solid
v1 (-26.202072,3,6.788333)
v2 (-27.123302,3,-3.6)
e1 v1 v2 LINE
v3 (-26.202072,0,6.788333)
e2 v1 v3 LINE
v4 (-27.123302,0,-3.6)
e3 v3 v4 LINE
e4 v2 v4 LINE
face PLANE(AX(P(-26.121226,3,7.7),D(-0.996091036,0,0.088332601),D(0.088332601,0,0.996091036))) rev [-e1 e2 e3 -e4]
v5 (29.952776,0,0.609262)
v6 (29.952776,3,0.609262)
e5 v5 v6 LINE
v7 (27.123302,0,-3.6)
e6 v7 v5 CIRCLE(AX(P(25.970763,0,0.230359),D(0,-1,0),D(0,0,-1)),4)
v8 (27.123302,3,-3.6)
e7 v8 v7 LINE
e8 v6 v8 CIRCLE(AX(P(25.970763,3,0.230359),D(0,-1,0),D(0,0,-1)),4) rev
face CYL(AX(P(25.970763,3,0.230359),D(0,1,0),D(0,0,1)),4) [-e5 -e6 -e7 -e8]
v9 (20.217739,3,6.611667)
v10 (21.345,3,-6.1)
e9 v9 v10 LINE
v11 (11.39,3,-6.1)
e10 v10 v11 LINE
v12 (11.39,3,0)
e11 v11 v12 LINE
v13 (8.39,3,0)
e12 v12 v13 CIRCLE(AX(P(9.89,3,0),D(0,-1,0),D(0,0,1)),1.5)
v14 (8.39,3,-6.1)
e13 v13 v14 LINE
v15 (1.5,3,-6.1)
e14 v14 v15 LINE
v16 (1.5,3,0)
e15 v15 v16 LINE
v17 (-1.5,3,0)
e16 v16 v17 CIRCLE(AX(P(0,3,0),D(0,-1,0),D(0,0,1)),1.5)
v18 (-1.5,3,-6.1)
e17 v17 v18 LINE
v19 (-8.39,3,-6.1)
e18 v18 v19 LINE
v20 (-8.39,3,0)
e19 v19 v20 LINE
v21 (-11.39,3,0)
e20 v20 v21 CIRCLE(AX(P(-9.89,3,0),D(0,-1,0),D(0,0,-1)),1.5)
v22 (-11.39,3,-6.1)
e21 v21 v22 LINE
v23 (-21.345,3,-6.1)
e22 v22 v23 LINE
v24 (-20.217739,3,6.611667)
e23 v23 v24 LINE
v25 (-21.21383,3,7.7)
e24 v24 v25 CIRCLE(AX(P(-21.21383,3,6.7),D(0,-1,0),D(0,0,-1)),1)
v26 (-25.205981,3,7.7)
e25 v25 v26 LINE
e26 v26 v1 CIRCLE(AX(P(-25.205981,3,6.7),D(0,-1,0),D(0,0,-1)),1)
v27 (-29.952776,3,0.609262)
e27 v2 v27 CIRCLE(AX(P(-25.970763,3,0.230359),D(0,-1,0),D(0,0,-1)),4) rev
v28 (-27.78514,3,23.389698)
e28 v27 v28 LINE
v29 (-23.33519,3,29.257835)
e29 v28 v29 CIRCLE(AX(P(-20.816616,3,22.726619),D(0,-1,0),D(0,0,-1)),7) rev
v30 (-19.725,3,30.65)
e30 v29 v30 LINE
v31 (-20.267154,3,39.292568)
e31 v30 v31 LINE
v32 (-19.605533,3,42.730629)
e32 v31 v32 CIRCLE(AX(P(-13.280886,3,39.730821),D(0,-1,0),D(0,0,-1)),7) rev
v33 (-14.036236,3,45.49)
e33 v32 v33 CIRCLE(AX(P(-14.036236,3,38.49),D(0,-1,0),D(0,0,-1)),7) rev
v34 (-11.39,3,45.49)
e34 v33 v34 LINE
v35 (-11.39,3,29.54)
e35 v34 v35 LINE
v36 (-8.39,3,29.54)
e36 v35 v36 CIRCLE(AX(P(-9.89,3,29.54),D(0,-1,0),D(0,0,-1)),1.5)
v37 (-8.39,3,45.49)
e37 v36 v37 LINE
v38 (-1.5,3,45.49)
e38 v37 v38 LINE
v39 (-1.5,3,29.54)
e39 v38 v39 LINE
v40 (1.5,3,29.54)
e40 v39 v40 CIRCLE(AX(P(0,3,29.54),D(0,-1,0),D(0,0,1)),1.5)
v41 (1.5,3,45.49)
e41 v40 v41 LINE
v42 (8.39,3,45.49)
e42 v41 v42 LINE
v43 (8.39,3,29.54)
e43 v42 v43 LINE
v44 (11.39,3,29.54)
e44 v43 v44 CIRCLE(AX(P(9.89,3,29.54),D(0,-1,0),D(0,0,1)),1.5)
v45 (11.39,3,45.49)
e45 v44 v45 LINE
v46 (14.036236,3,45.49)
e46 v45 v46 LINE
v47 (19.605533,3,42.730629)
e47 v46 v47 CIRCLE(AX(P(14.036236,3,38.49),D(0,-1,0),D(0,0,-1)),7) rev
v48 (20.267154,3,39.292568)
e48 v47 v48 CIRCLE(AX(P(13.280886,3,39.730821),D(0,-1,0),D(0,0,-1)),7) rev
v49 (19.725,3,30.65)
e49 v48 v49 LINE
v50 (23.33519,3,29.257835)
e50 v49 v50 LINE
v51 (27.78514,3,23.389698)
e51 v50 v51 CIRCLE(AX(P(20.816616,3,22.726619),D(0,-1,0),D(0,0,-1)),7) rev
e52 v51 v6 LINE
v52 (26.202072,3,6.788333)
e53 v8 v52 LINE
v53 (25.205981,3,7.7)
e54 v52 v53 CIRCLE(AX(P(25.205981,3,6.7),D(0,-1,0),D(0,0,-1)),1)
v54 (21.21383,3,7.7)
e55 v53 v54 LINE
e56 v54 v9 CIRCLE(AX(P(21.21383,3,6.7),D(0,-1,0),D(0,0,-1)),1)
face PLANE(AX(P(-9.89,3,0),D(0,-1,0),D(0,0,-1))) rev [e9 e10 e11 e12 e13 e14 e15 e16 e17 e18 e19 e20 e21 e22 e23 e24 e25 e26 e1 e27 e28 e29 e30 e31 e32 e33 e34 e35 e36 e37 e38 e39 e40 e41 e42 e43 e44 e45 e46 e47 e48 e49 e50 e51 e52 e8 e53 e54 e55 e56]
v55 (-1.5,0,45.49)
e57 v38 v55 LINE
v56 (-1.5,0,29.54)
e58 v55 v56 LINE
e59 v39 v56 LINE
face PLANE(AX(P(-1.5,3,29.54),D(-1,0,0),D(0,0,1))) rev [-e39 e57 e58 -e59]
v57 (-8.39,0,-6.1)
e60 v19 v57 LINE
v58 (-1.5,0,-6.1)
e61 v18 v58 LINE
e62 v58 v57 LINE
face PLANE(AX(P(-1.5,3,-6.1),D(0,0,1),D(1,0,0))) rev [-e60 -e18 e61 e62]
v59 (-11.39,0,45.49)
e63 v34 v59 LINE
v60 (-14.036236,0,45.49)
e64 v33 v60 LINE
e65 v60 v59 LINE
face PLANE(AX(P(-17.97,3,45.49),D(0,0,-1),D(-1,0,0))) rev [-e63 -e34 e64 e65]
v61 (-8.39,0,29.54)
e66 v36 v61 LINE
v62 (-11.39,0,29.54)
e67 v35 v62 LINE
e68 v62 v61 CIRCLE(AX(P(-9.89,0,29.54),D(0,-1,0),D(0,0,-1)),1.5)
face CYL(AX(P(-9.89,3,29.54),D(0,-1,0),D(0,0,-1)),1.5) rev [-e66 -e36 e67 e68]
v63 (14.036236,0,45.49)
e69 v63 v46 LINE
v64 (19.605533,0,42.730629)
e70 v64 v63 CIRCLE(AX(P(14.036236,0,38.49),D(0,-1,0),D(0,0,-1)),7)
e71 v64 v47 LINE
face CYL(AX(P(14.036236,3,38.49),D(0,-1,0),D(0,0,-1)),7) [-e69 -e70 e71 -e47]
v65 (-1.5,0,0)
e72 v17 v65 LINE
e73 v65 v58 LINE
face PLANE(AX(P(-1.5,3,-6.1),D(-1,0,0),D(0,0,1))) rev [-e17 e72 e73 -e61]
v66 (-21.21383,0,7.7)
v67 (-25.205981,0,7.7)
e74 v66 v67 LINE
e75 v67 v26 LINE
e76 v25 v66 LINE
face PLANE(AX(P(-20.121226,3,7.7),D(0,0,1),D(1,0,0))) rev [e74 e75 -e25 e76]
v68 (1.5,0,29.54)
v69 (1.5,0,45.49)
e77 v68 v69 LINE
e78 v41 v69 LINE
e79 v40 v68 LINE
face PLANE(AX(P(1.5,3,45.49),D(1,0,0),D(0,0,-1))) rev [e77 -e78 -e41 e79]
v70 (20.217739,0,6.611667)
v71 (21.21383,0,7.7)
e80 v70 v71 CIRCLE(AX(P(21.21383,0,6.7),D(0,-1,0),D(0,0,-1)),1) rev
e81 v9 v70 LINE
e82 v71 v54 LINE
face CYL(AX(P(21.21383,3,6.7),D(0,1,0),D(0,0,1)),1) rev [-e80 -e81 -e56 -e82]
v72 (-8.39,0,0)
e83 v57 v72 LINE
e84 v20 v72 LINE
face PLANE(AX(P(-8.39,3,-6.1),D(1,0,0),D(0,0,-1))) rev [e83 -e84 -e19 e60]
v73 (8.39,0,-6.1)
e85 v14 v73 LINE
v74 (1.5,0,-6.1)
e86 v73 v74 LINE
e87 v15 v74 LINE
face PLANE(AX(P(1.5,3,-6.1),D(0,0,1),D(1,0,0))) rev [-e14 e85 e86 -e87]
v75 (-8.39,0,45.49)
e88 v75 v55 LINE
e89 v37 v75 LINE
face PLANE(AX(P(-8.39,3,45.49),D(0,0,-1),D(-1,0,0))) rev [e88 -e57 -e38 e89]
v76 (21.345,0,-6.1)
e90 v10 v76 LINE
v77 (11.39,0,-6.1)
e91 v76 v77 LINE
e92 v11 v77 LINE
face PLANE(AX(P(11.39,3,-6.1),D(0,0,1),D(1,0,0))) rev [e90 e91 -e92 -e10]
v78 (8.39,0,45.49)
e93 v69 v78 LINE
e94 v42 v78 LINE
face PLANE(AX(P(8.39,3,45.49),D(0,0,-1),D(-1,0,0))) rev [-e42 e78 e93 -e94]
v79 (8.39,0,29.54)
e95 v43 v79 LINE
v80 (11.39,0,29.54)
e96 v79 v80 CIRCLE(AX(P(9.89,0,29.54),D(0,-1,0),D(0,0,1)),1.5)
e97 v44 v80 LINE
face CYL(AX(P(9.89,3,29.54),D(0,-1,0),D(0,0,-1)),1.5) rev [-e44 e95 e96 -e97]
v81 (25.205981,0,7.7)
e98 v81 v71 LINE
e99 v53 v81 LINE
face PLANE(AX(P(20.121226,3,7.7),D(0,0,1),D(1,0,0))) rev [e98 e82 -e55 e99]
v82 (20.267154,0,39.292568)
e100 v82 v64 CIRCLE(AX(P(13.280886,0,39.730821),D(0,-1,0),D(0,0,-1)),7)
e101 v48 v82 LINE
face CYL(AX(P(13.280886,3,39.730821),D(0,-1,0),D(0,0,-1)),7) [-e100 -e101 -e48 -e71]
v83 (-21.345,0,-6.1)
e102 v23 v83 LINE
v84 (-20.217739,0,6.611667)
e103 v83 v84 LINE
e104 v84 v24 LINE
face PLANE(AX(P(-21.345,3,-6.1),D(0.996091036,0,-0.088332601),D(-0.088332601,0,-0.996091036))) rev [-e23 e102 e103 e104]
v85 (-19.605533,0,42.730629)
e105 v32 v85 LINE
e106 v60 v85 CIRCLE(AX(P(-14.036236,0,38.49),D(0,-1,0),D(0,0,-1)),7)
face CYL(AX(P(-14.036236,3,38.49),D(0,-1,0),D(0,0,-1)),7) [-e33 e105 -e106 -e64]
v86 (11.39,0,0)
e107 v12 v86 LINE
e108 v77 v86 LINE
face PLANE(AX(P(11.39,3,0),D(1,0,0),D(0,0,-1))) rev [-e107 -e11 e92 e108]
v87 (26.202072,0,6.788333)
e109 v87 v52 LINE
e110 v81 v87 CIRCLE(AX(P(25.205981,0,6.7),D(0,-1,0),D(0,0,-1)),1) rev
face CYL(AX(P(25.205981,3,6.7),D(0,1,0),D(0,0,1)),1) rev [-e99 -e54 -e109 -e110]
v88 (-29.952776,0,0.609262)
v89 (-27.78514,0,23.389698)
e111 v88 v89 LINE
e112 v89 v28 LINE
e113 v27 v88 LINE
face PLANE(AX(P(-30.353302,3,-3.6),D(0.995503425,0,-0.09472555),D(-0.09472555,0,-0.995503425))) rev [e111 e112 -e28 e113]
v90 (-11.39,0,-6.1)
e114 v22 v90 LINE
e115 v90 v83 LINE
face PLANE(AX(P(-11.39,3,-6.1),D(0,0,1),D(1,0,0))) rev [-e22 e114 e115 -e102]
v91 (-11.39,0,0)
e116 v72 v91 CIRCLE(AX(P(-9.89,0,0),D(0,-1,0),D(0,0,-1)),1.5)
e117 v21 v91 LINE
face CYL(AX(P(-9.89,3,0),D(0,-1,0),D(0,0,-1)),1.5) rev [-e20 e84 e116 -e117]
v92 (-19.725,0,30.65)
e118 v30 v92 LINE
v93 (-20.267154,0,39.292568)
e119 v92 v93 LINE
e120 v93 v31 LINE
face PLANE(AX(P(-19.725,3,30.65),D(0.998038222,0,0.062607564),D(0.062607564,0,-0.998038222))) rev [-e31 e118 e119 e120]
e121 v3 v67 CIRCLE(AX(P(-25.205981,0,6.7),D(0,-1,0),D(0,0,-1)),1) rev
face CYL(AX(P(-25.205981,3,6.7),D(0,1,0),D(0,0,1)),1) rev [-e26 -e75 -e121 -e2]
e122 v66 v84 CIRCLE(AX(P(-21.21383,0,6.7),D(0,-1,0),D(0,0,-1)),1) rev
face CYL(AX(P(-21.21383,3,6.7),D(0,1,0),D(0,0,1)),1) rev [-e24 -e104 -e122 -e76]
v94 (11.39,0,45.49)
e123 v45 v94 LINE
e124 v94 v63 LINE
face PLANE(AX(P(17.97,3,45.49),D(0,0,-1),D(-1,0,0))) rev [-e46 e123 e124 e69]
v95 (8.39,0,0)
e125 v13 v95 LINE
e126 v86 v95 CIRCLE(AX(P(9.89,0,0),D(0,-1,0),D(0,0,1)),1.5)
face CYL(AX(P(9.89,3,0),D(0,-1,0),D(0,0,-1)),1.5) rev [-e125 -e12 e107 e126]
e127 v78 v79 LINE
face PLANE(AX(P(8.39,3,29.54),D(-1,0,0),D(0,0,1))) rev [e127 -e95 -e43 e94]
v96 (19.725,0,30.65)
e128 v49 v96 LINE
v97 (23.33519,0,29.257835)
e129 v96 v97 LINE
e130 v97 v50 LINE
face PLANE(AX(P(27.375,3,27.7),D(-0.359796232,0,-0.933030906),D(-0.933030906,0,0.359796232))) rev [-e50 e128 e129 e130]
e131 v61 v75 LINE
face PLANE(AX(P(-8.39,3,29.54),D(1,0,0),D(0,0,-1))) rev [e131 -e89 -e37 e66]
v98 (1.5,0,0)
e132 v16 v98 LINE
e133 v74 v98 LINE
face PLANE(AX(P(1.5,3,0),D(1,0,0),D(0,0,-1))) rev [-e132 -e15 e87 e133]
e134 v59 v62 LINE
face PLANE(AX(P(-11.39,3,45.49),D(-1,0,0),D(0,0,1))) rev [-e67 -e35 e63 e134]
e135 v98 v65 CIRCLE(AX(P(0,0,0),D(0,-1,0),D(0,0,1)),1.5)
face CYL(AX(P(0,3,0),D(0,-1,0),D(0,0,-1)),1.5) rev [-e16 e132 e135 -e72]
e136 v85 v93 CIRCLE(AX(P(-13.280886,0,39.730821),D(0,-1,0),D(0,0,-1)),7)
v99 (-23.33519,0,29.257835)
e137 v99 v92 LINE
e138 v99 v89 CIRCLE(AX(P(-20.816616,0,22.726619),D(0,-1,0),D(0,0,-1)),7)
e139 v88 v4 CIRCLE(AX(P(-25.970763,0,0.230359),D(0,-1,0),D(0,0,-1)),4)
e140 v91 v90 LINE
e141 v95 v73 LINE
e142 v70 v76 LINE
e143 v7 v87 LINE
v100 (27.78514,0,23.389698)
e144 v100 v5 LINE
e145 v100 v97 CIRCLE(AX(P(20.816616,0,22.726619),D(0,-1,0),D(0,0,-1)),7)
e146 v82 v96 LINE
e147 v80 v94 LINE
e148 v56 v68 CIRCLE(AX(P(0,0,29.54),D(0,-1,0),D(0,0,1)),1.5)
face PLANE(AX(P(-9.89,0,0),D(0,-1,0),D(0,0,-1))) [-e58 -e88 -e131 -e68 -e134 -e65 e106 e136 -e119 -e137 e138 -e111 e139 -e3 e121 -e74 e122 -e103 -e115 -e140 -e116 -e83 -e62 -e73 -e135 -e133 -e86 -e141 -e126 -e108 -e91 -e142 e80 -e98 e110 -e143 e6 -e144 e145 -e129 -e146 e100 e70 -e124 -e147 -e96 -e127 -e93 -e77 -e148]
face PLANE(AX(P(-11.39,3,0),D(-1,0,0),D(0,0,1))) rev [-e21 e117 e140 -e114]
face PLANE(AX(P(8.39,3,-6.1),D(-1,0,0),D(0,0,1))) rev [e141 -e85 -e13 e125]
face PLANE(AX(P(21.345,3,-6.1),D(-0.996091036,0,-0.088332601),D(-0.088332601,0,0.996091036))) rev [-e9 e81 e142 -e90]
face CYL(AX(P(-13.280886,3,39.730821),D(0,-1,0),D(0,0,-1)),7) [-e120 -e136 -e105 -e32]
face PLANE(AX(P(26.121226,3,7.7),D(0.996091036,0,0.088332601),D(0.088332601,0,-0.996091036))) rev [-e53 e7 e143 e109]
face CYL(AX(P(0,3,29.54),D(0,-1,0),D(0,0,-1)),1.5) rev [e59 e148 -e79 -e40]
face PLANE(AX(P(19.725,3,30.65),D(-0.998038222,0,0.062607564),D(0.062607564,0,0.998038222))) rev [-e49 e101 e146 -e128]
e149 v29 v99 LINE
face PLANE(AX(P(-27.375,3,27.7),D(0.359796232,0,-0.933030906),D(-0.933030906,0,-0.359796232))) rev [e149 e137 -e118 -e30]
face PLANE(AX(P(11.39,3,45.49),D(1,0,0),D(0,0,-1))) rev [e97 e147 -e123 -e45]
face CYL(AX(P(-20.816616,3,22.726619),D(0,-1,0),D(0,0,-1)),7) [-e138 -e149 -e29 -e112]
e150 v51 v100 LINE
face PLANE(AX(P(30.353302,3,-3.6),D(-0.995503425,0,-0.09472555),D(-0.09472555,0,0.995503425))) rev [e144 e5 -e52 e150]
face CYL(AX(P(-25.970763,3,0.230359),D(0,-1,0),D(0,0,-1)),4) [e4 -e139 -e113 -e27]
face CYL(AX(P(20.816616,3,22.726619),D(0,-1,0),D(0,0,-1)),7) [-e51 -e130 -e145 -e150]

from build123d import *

# Parameters (mm, degrees)
BOSS_EXTRUDE1_DEPTH = 3
FILLET1_R           = 4
FILLET2_R           = 1
FILLET3_R           = 7


with BuildPart() as part:
    # Sketch1 → Boss-Extrude1 (new body)
    with BuildSketch(Plane(origin=(0, 0, 0), x_dir=(1, 0, 0), z_dir=(0, 1, 0))):
        with BuildLine():
            Line((-1.5, 6.1), (-1.5, 0))
            ThreePointArc((-1.5, 0), (0, -1.5), (1.5, 0))
            Line((1.5, 0), (1.5, 6.1))
            Line((1.5, 6.1), (8.39, 6.1))
            Line((8.39, 6.1), (8.39, 0))
            ThreePointArc((8.39, 0), (9.89, -1.5), (11.39, 0))
            Line((11.39, 0), (11.39, 6.1))
            Line((11.39, 6.1), (21.345, 6.1))
            Line((21.345, 6.1), (20.121226415, -7.7))
            Line((20.121226415, -7.7), (26.121226415, -7.7))
            Line((26.121226415, -7.7), (27.123301887, 3.6))
            Line((27.123301887, 3.6), (30.353301887, 3.6))
            Line((30.353301887, 3.6), (27.375, -27.7))
            Line((27.375, -27.7), (19.725, -30.65))
            Line((19.725, -30.65), (20.405, -41.49))
            Line((20.405, -41.49), (17.97, -45.49))
            Line((17.97, -45.49), (11.39, -45.49))
            Line((11.39, -45.49), (11.39, -29.54))
            ThreePointArc((11.39, -29.54), (9.89, -28.04), (8.39, -29.54))
            Line((8.39, -29.54), (8.39, -45.49))
            Line((8.39, -45.49), (1.5, -45.49))
            Line((1.5, -45.49), (1.5, -29.54))
            ThreePointArc((1.5, -29.54), (0, -28.04), (-1.5, -29.54))
            Line((-1.5, -29.54), (-1.5, -45.49))
            Line((-1.5, -45.49), (-8.39, -45.49))
            Line((-8.39, -45.49), (-8.39, -29.54))
            ThreePointArc((-8.39, -29.54), (-9.89, -28.04), (-11.39, -29.54))
            Line((-11.39, -29.54), (-11.39, -45.49))
            Line((-11.39, -45.49), (-17.97, -45.49))
            Line((-17.97, -45.49), (-20.405, -41.49))
            Line((-20.405, -41.49), (-19.725, -30.65))
            Line((-19.725, -30.65), (-27.375, -27.7))
            Line((-27.375, -27.7), (-30.353301887, 3.6))
            Line((-30.353301887, 3.6), (-27.123301887, 3.6))
            Line((-27.123301887, 3.6), (-26.121226415, -7.7))
            Line((-26.121226415, -7.7), (-20.121226415, -7.7))
            Line((-20.121226415, -7.7), (-21.345, 6.1))
            Line((-21.345, 6.1), (-11.39, 6.1))
            Line((-11.39, 6.1), (-11.39, 0))
            ThreePointArc((-11.39, 0), (-9.89, -1.5), (-8.39, 0))
            Line((-8.39, 0), (-8.39, 6.1))
            Line((-8.39, 6.1), (-1.5, 6.1))
        make_face()
    extrude(amount=BOSS_EXTRUDE1_DEPTH)

    # Fillet1
    # the kernel refuses this fillet: 4 mm, written as the material it takes off along each edge
    with BuildSketch(Plane(origin=(-30.353301887, -10.570685878, -3.6), x_dir=(0.09472555048973348, 0, 0.9955034254508706), z_dir=(0, 1, 0))) as fillet1_piece_1:
        with BuildLine():
            CenterArc((4.228274351, 4), FILLET1_R, 191.310800098, 78.689199902)
            Line((0.305963528, 3.215476064), (0.227517312, 3.199785585))
            ThreePointArc((0.227517312, 3.199785585), (0.07334149, 1.615316076), (-0.079640274, 0.007578044))
            Line((-0.079640274, 0.007578044), (0, -0.08))
            Line((0, -0.08), (4.228274351, -0.08))
            Line((4.228274351, -0.08), (4.228274351, 0))
        make_face()
    extrude(amount=24.141371757, mode=Mode.SUBTRACT)
    with BuildSketch(Plane(origin=(30.353301887, -10.570685878, -3.6), x_dir=(-1, 0, 0), z_dir=(0, 1, 0))) as fillet1_piece_2:
        with BuildLine():
            CenterArc((4.382539317, 3.830359399), FILLET1_R, 174.564476221, 78.689199902)
            Line((0.400525616, 4.2092616), (0.320885342, 4.216839645))
            Line((0.320885342, 4.216839645), (-0.079640274, 0.007578044))
            Line((-0.079640274, 0.007578044), (0, -0.08))
            ThreePointArc((0, -0.08), (1.615, -0.08), (3.206949214, -0.076607188))
            Line((3.206949214, -0.076607188), (3.23, 0))
        make_face()
    extrude(amount=24.141371757, mode=Mode.SUBTRACT)

    # Fillet2
    fillet2_edges = [part.edges().sort_by_distance(p)[0] for p in [
        (20.121226415, 1.5, 7.7),
        (26.121226415, 1.5, 7.7),
        (-26.121226415, 1.5, 7.7),
        (-20.121226415, 1.5, 7.7),
    ]]
    fillet(fillet2_edges, radius=FILLET2_R)

    # Fillet3
    # the kernel refuses this fillet: 7 mm, written as the material it takes off along each edge
    with BuildSketch(Plane(origin=(-17.97, -9.834409558, 45.49), x_dir=(-0.5199808190603072, 0, -0.8541779368547118), z_dir=(0, 1, 0)), Plane(origin=(17.97, -9.834409558, 45.49), x_dir=(-1, 0, 0), z_dir=(0, 1, 0))) as fillet3_piece_1:
        with BuildLine():
            CenterArc((FILLET3_R * 0.561966260458, -FILLET3_R), FILLET3_R, 90, 58.669035113)
            Line((-FILLET3_R * 0.292211676397, -FILLET3_R * 0.48001918094), (0, 0))
            Line((0, 0), (FILLET3_R * 0.561966260458, 0))
        make_face()
    extrude(amount=22.668819116, mode=Mode.SUBTRACT)
    with BuildSketch(Plane(origin=(-20.405, -5.504377364, 41.49), x_dir=(0.0626075637538876, 0, -0.9980382221943221), z_dir=(0, 1, 0)), Plane(origin=(20.405, -5.504377364, 41.49), x_dir=(-0.5199808190603077, 0, 0.8541779368547114), z_dir=(0, 1, 0))) as fillet3_piece_2:
        with BuildLine():
            CenterArc((FILLET3_R * 0.314535849376, -FILLET3_R), FILLET3_R, 90, 34.920461628)
            Line((-FILLET3_R * 0.257902882493, -FILLET3_R * 0.180052502744), (0, 0))
            Line((0, 0), (FILLET3_R * 0.314535849376, 0))
        make_face()
    extrude(amount=14.008754728, mode=Mode.SUBTRACT)
    with BuildSketch(Plane(origin=(-27.375, -10.824428121, 27.7), x_dir=(-0.09472555048973366, 0, -0.9955034254508704), z_dir=(0, 1, 0)), Plane(origin=(27.375, -10.824428121, 27.7), x_dir=(-0.9330309060396333, 0, 0.3597962317407744), z_dir=(0, 1, 0))) as fillet3_piece_3:
        with BuildLine():
            CenterArc((FILLET3_R * 0.61853874979, -FILLET3_R), FILLET3_R, 90, 63.476793772)
            Line((-FILLET3_R * 0.276214817108, -FILLET3_R * 0.553439752639), (0, 0))
            Line((0, 0), (FILLET3_R * 0.61853874979, 0))
        make_face()
    extrude(amount=24.648856243, mode=Mode.SUBTRACT)


solid = part.part
